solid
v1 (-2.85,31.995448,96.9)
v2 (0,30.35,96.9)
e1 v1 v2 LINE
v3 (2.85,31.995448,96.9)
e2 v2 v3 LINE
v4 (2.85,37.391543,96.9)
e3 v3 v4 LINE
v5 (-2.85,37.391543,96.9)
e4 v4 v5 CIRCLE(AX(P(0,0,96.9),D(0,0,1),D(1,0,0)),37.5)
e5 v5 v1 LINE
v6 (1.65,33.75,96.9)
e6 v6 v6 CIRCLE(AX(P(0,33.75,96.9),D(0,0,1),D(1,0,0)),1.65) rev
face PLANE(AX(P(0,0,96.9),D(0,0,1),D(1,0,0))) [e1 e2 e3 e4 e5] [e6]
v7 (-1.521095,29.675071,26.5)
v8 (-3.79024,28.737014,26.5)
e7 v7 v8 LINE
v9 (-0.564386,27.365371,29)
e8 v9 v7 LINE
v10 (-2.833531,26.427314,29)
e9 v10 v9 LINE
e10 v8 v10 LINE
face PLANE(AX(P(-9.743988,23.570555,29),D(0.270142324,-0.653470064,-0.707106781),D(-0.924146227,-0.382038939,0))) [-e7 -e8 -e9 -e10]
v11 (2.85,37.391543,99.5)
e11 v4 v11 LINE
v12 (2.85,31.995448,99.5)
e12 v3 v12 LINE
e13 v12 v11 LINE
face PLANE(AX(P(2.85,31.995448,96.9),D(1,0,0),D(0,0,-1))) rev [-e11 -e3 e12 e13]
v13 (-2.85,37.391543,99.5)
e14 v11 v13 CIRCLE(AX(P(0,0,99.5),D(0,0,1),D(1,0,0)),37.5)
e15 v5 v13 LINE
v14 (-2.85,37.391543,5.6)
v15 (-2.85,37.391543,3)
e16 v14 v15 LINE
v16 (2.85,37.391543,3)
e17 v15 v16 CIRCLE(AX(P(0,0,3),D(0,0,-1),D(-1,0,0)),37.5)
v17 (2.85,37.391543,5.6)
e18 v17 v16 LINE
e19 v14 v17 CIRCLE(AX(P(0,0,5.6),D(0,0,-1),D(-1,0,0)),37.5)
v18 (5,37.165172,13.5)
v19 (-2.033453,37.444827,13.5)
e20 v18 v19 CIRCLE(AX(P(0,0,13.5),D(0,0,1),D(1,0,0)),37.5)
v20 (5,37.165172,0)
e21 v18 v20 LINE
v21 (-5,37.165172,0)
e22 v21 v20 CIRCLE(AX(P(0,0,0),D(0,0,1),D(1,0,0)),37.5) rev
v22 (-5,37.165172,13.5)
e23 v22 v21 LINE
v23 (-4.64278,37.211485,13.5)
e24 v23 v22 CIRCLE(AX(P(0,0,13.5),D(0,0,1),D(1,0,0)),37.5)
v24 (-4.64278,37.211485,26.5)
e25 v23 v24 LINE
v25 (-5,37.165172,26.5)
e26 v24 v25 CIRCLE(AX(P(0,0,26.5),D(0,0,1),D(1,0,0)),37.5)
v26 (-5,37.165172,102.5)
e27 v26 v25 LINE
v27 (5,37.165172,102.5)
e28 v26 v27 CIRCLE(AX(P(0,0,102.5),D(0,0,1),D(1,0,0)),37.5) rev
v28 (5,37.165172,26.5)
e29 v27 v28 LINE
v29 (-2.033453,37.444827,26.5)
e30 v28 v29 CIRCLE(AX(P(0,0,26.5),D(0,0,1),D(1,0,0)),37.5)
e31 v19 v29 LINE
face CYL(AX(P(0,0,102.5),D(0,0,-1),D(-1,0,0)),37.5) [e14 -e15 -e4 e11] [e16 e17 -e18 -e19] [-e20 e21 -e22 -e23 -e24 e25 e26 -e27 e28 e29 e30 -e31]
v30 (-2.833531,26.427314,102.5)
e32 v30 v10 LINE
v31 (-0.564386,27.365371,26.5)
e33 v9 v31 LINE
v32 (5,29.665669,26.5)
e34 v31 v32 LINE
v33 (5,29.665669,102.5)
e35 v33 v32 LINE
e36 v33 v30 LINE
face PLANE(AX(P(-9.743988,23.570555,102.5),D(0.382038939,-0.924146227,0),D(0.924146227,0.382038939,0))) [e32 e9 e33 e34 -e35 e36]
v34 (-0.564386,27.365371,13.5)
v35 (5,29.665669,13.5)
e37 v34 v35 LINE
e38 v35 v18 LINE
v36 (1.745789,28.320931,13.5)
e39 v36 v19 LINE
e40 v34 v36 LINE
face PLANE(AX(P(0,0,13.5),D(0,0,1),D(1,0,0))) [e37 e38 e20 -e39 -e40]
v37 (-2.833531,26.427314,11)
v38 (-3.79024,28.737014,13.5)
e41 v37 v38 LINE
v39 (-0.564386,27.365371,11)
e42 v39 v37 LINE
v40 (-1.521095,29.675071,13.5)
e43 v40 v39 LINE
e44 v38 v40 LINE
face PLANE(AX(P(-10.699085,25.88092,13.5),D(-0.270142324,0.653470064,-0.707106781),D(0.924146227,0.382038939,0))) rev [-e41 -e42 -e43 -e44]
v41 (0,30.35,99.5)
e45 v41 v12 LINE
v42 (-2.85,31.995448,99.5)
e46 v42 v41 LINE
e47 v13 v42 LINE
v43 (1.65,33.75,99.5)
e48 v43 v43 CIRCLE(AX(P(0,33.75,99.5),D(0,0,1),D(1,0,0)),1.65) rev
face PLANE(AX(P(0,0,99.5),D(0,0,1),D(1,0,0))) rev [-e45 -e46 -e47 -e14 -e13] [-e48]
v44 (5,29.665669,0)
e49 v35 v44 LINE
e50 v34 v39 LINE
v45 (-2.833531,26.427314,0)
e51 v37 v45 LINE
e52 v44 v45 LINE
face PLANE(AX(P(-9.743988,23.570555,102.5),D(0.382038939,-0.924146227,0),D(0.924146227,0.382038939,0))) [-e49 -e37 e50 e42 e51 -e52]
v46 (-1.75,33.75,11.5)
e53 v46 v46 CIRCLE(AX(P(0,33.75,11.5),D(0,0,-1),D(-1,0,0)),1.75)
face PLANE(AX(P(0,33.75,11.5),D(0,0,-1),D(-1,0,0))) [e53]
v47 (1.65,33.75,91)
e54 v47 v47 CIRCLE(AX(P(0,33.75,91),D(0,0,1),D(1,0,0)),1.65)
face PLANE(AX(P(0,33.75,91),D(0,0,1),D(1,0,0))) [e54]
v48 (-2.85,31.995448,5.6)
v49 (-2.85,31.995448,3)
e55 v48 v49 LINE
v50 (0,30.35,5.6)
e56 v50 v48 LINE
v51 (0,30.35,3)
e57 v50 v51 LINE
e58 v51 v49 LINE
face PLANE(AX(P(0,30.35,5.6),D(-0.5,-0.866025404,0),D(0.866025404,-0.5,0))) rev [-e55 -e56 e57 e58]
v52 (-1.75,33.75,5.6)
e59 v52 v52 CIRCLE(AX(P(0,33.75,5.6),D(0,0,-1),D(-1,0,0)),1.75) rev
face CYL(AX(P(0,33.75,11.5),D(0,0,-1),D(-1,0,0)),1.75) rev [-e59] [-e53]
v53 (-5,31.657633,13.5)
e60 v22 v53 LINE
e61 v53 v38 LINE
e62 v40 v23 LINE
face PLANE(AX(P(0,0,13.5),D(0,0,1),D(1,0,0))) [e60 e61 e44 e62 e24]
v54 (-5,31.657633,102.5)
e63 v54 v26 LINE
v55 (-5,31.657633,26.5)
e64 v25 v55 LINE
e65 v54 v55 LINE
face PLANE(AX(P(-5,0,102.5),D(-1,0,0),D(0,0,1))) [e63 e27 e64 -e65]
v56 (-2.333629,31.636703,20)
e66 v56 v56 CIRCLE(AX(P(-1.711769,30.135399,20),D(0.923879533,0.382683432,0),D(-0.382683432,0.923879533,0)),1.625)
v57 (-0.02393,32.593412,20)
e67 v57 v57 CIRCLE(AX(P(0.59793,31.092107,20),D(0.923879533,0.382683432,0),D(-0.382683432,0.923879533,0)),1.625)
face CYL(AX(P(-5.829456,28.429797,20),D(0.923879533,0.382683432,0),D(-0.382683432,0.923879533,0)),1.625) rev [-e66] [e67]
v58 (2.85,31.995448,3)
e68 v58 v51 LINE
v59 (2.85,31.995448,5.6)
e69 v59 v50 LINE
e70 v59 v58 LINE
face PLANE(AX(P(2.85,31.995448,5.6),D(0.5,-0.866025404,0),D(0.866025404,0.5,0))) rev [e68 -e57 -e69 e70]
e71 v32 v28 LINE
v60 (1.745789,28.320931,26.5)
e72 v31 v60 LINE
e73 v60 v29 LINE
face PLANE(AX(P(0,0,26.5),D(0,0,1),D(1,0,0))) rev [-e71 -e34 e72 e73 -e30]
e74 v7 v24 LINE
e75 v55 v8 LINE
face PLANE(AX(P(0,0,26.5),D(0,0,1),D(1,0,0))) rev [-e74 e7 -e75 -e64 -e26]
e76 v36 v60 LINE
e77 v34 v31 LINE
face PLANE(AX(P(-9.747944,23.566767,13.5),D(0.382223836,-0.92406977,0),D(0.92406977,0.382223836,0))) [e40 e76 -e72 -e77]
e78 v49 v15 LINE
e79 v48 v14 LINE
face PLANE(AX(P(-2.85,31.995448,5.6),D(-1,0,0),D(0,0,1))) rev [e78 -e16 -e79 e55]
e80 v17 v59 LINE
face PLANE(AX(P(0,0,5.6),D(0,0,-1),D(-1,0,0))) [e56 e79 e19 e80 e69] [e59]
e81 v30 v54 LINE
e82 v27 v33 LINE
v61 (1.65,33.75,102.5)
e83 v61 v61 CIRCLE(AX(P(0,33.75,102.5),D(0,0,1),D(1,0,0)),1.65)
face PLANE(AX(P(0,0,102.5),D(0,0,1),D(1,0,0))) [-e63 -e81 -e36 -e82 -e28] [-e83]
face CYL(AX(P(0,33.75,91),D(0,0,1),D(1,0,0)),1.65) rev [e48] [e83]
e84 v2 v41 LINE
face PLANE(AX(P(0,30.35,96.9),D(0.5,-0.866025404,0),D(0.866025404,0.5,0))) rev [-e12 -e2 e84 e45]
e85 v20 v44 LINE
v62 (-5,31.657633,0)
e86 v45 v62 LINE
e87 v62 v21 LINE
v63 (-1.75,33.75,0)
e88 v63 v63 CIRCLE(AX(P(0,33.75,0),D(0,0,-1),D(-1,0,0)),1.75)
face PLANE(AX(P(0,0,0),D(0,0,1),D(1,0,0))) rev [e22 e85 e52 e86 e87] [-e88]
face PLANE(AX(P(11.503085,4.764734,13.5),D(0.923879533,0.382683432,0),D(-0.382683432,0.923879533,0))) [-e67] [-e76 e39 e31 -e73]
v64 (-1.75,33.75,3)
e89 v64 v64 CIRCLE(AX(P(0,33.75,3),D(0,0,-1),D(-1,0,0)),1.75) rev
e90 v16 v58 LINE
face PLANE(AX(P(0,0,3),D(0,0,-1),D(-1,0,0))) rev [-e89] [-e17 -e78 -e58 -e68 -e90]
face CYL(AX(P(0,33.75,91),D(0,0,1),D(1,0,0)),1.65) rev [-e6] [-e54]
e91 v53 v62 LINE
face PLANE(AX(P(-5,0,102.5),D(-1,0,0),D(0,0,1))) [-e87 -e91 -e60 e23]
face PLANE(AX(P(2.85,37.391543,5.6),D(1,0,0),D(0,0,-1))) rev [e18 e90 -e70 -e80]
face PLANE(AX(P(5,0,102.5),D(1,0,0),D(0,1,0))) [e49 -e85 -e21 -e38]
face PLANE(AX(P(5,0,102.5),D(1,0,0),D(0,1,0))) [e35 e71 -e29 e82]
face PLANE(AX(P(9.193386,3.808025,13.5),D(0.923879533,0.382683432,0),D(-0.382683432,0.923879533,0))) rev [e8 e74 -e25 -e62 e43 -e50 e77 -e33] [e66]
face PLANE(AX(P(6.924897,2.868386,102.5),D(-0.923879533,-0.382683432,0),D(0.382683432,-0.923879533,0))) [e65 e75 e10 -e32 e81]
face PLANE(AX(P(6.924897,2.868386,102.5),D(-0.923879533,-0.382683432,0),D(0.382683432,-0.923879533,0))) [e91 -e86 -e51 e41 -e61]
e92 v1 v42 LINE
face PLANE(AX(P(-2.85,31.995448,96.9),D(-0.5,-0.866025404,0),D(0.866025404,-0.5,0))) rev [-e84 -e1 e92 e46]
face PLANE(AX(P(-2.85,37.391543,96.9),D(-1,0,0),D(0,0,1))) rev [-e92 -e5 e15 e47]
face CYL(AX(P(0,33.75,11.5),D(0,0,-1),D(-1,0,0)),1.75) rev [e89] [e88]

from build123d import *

# Parameters (mm, degrees)
BOSS_EXTRU_2_DEPTH       = 102.5
ESQUISSE8_R              = 1.75
ENL_V_MAT_EXTRU_5_DEPTH  = 11.5
ENL_V_START              = -3
ENL_V_MAT_EXTRU_6_DEPTH  = 2.6
ENL_V_START_2            = -89
ENL_V_MAT_EXTRU_11_DEPTH = 13
ESQUISSE15_R             = 1.625
ENL_V_MAT_EXTRU_12_DEPTH = 109.858621468
CHANFREIN1_SIZE          = 2.5
ESQUISSE16_R             = 1.65
ENL_V_MAT_EXTRU_13_DEPTH = 11.5
ENL_V_START_3            = -5.6
ENL_V_MAT_EXTRU_14_DEPTH = 2.6


with BuildPart() as part:
    # Esquisse3 → Boss.-Extru.2 (new body)
    with BuildSketch(Plane.XY):
        with BuildLine():
            Line((5, 29.665669478), (-2.833530831, 26.427314208))
            Line((-2.833530831, 26.427314208), (-5, 31.657633458))
            Line((-5, 31.657633458), (-5, 37.165171868))
            ThreePointArc((-5, 37.165171868), (0, 37.5), (5, 37.165171868))
            Line((5, 37.165171868), (5, 29.665669478))
        make_face()
    extrude(amount=BOSS_EXTRU_2_DEPTH)

    # Esquisse8 → Enlèv. mat.-Extru.5 (cut)
    with BuildSketch(Plane(origin=(0, 0, 0), x_dir=(-1, 0, 0), z_dir=(0, 0, -1))):
        with Locations((0, 33.75)):
            Circle(ESQUISSE8_R)
    extrude(amount=-ENL_V_MAT_EXTRU_5_DEPTH, mode=Mode.SUBTRACT)

    # Esquisse9 → Enlèv. mat.-Extru.6 (cut)
    with BuildSketch(Plane(origin=(0, 0, 0), x_dir=(-1, 0, 0), z_dir=(0, 0, -1)).offset(ENL_V_START)):
        with BuildLine():
            Line((-2.85, 37.391543162), (-2.85, 31.995448267))
            Line((-2.85, 31.995448267), (0, 30.35))
            Line((0, 30.35), (2.85, 31.995448267))
            Line((2.85, 31.995448267), (2.85, 37.391543162))
            ThreePointArc((2.85, 37.391543162), (0, 37.5), (-2.85, 37.391543162))
        make_face()
    extrude(amount=-ENL_V_MAT_EXTRU_6_DEPTH, mode=Mode.SUBTRACT)

    # Esquisse14 → Enlèv. mat.-Extru.11 (cut)
    with BuildSketch(Plane.XY.offset(102.5).offset(ENL_V_START_2)):
        with BuildLine():
            Line((-2.833530831, 26.427314208), (-0.564385746, 27.365371146))
            Line((-0.564385746, 27.365371146), (-4.642779542, 37.211484761))
            ThreePointArc((-4.642779542, 37.211484761), (-4.821445379, 37.188757232), (-5, 37.165171868))
            Line((-5, 37.165171868), (-5, 31.657633458))
            Line((-5, 31.657633458), (-2.833530831, 26.427314208))
        make_face()
        with BuildLine():
            Line((1.745788964, 28.320930853), (-0.564385746, 27.365371146))
            Line((-0.564385746, 27.365371146), (5, 29.665669478))
            Line((5, 29.665669478), (5, 37.165171868))
            ThreePointArc((5, 37.165171868), (1.48984988, 37.470392943), (-2.03345257, 37.444827021))
            Line((-2.03345257, 37.444827021), (1.745788964, 28.320930853))
        make_face()
    extrude(amount=ENL_V_MAT_EXTRU_11_DEPTH, mode=Mode.SUBTRACT)

    # Esquisse15 → Enlèv. mat.-Extru.12 (cut, through all)
    with BuildSketch(Plane(origin=(11.503085218, 4.764733906, 0), x_dir=(0, 0, -1), z_dir=(0.9238795325112864, 0.38268343236509095, 0))):
        with Locations(Location((-20, 28.49654364, 0), (0, 0, 90))):
            Circle(ESQUISSE15_R)
    extrude(amount=-ENL_V_MAT_EXTRU_12_DEPTH, mode=Mode.SUBTRACT)

    # Chanfrein1
    # the kernel refuses this chamfer: 2.5 mm, written as the material it takes off along each edge
    with BuildSketch(Plane(origin=(-8.775058658, 23.971106609, 13.5), x_dir=(0.010504495520027614, -0.025410210633805018, -0.9996219169112968), z_dir=(0.924146227220892, 0.38203893873974615, 0))) as chanfrein1_piece_1_section:
        Polygon((CHANFREIN1_SIZE * 0.999621916911, CHANFREIN1_SIZE * 0.0274958766106), (-CHANFREIN1_SIZE * 0.0274958766106, CHANFREIN1_SIZE * 0.999621916911), (0, 0), align=None)
    chanfrein1_piece_1 = extrude(amount=8.884603616, mode=Mode.PRIVATE)
    chanfrein1_piece_1 = split(chanfrein1_piece_1, bisect_by=Plane(origin=(-0.88361638, 28.136062073, 12.666666667), z_dir=(-0.9238795325112863, -0.382683432365091, 0)), keep=Keep.TOP, mode=Mode.PRIVATE)
    add(chanfrein1_piece_1, mode=Mode.SUBTRACT)
    with BuildSketch(Plane(origin=(-8.775058658, 23.971106609, 26.5), x_dir=(-0.38189449627778244, 0.9237968231608907, -0.027495876610586317), z_dir=(0.924146227220892, 0.38203893873974615, 0))) as chanfrein1_piece_2_section:
        Polygon((CHANFREIN1_SIZE * 0.999621916911, CHANFREIN1_SIZE * 0.0274958766106), (-CHANFREIN1_SIZE * 0.0274958766106, CHANFREIN1_SIZE * 0.999621916911), (0, 0), align=None)
    chanfrein1_piece_2 = extrude(amount=8.884603616, mode=Mode.PRIVATE)
    chanfrein1_piece_2 = split(chanfrein1_piece_2, bisect_by=Plane(origin=(-0.88361638, 28.136062073, 27.333333333), z_dir=(-0.9238795325112863, -0.382683432365091, 0)), keep=Keep.TOP, mode=Mode.PRIVATE)
    add(chanfrein1_piece_2, mode=Mode.SUBTRACT)

    # Esquisse16 → Enlèv. mat.-Extru.13 (cut)
    with BuildSketch(Plane.XY.offset(102.5)):
        with Locations((0, 33.75)):
            Circle(ESQUISSE16_R)
    extrude(amount=-ENL_V_MAT_EXTRU_13_DEPTH, mode=Mode.SUBTRACT)

    # Esquisse17 → Enlèv. mat.-Extru.14 (cut)
    with BuildSketch(Plane.XY.offset(102.5).offset(ENL_V_START_3)):
        with BuildLine():
            Line((-2.85, 37.391543162), (-2.85, 31.995448267))
            Line((-2.85, 31.995448267), (0, 30.35))
            Line((0, 30.35), (2.85, 31.995448267))
            Line((2.85, 31.995448267), (2.85, 37.391543162))
            ThreePointArc((2.85, 37.391543162), (0, 37.5), (-2.85, 37.391543162))
        make_face()
    extrude(amount=ENL_V_MAT_EXTRU_14_DEPTH, mode=Mode.SUBTRACT)


solid = part.part
